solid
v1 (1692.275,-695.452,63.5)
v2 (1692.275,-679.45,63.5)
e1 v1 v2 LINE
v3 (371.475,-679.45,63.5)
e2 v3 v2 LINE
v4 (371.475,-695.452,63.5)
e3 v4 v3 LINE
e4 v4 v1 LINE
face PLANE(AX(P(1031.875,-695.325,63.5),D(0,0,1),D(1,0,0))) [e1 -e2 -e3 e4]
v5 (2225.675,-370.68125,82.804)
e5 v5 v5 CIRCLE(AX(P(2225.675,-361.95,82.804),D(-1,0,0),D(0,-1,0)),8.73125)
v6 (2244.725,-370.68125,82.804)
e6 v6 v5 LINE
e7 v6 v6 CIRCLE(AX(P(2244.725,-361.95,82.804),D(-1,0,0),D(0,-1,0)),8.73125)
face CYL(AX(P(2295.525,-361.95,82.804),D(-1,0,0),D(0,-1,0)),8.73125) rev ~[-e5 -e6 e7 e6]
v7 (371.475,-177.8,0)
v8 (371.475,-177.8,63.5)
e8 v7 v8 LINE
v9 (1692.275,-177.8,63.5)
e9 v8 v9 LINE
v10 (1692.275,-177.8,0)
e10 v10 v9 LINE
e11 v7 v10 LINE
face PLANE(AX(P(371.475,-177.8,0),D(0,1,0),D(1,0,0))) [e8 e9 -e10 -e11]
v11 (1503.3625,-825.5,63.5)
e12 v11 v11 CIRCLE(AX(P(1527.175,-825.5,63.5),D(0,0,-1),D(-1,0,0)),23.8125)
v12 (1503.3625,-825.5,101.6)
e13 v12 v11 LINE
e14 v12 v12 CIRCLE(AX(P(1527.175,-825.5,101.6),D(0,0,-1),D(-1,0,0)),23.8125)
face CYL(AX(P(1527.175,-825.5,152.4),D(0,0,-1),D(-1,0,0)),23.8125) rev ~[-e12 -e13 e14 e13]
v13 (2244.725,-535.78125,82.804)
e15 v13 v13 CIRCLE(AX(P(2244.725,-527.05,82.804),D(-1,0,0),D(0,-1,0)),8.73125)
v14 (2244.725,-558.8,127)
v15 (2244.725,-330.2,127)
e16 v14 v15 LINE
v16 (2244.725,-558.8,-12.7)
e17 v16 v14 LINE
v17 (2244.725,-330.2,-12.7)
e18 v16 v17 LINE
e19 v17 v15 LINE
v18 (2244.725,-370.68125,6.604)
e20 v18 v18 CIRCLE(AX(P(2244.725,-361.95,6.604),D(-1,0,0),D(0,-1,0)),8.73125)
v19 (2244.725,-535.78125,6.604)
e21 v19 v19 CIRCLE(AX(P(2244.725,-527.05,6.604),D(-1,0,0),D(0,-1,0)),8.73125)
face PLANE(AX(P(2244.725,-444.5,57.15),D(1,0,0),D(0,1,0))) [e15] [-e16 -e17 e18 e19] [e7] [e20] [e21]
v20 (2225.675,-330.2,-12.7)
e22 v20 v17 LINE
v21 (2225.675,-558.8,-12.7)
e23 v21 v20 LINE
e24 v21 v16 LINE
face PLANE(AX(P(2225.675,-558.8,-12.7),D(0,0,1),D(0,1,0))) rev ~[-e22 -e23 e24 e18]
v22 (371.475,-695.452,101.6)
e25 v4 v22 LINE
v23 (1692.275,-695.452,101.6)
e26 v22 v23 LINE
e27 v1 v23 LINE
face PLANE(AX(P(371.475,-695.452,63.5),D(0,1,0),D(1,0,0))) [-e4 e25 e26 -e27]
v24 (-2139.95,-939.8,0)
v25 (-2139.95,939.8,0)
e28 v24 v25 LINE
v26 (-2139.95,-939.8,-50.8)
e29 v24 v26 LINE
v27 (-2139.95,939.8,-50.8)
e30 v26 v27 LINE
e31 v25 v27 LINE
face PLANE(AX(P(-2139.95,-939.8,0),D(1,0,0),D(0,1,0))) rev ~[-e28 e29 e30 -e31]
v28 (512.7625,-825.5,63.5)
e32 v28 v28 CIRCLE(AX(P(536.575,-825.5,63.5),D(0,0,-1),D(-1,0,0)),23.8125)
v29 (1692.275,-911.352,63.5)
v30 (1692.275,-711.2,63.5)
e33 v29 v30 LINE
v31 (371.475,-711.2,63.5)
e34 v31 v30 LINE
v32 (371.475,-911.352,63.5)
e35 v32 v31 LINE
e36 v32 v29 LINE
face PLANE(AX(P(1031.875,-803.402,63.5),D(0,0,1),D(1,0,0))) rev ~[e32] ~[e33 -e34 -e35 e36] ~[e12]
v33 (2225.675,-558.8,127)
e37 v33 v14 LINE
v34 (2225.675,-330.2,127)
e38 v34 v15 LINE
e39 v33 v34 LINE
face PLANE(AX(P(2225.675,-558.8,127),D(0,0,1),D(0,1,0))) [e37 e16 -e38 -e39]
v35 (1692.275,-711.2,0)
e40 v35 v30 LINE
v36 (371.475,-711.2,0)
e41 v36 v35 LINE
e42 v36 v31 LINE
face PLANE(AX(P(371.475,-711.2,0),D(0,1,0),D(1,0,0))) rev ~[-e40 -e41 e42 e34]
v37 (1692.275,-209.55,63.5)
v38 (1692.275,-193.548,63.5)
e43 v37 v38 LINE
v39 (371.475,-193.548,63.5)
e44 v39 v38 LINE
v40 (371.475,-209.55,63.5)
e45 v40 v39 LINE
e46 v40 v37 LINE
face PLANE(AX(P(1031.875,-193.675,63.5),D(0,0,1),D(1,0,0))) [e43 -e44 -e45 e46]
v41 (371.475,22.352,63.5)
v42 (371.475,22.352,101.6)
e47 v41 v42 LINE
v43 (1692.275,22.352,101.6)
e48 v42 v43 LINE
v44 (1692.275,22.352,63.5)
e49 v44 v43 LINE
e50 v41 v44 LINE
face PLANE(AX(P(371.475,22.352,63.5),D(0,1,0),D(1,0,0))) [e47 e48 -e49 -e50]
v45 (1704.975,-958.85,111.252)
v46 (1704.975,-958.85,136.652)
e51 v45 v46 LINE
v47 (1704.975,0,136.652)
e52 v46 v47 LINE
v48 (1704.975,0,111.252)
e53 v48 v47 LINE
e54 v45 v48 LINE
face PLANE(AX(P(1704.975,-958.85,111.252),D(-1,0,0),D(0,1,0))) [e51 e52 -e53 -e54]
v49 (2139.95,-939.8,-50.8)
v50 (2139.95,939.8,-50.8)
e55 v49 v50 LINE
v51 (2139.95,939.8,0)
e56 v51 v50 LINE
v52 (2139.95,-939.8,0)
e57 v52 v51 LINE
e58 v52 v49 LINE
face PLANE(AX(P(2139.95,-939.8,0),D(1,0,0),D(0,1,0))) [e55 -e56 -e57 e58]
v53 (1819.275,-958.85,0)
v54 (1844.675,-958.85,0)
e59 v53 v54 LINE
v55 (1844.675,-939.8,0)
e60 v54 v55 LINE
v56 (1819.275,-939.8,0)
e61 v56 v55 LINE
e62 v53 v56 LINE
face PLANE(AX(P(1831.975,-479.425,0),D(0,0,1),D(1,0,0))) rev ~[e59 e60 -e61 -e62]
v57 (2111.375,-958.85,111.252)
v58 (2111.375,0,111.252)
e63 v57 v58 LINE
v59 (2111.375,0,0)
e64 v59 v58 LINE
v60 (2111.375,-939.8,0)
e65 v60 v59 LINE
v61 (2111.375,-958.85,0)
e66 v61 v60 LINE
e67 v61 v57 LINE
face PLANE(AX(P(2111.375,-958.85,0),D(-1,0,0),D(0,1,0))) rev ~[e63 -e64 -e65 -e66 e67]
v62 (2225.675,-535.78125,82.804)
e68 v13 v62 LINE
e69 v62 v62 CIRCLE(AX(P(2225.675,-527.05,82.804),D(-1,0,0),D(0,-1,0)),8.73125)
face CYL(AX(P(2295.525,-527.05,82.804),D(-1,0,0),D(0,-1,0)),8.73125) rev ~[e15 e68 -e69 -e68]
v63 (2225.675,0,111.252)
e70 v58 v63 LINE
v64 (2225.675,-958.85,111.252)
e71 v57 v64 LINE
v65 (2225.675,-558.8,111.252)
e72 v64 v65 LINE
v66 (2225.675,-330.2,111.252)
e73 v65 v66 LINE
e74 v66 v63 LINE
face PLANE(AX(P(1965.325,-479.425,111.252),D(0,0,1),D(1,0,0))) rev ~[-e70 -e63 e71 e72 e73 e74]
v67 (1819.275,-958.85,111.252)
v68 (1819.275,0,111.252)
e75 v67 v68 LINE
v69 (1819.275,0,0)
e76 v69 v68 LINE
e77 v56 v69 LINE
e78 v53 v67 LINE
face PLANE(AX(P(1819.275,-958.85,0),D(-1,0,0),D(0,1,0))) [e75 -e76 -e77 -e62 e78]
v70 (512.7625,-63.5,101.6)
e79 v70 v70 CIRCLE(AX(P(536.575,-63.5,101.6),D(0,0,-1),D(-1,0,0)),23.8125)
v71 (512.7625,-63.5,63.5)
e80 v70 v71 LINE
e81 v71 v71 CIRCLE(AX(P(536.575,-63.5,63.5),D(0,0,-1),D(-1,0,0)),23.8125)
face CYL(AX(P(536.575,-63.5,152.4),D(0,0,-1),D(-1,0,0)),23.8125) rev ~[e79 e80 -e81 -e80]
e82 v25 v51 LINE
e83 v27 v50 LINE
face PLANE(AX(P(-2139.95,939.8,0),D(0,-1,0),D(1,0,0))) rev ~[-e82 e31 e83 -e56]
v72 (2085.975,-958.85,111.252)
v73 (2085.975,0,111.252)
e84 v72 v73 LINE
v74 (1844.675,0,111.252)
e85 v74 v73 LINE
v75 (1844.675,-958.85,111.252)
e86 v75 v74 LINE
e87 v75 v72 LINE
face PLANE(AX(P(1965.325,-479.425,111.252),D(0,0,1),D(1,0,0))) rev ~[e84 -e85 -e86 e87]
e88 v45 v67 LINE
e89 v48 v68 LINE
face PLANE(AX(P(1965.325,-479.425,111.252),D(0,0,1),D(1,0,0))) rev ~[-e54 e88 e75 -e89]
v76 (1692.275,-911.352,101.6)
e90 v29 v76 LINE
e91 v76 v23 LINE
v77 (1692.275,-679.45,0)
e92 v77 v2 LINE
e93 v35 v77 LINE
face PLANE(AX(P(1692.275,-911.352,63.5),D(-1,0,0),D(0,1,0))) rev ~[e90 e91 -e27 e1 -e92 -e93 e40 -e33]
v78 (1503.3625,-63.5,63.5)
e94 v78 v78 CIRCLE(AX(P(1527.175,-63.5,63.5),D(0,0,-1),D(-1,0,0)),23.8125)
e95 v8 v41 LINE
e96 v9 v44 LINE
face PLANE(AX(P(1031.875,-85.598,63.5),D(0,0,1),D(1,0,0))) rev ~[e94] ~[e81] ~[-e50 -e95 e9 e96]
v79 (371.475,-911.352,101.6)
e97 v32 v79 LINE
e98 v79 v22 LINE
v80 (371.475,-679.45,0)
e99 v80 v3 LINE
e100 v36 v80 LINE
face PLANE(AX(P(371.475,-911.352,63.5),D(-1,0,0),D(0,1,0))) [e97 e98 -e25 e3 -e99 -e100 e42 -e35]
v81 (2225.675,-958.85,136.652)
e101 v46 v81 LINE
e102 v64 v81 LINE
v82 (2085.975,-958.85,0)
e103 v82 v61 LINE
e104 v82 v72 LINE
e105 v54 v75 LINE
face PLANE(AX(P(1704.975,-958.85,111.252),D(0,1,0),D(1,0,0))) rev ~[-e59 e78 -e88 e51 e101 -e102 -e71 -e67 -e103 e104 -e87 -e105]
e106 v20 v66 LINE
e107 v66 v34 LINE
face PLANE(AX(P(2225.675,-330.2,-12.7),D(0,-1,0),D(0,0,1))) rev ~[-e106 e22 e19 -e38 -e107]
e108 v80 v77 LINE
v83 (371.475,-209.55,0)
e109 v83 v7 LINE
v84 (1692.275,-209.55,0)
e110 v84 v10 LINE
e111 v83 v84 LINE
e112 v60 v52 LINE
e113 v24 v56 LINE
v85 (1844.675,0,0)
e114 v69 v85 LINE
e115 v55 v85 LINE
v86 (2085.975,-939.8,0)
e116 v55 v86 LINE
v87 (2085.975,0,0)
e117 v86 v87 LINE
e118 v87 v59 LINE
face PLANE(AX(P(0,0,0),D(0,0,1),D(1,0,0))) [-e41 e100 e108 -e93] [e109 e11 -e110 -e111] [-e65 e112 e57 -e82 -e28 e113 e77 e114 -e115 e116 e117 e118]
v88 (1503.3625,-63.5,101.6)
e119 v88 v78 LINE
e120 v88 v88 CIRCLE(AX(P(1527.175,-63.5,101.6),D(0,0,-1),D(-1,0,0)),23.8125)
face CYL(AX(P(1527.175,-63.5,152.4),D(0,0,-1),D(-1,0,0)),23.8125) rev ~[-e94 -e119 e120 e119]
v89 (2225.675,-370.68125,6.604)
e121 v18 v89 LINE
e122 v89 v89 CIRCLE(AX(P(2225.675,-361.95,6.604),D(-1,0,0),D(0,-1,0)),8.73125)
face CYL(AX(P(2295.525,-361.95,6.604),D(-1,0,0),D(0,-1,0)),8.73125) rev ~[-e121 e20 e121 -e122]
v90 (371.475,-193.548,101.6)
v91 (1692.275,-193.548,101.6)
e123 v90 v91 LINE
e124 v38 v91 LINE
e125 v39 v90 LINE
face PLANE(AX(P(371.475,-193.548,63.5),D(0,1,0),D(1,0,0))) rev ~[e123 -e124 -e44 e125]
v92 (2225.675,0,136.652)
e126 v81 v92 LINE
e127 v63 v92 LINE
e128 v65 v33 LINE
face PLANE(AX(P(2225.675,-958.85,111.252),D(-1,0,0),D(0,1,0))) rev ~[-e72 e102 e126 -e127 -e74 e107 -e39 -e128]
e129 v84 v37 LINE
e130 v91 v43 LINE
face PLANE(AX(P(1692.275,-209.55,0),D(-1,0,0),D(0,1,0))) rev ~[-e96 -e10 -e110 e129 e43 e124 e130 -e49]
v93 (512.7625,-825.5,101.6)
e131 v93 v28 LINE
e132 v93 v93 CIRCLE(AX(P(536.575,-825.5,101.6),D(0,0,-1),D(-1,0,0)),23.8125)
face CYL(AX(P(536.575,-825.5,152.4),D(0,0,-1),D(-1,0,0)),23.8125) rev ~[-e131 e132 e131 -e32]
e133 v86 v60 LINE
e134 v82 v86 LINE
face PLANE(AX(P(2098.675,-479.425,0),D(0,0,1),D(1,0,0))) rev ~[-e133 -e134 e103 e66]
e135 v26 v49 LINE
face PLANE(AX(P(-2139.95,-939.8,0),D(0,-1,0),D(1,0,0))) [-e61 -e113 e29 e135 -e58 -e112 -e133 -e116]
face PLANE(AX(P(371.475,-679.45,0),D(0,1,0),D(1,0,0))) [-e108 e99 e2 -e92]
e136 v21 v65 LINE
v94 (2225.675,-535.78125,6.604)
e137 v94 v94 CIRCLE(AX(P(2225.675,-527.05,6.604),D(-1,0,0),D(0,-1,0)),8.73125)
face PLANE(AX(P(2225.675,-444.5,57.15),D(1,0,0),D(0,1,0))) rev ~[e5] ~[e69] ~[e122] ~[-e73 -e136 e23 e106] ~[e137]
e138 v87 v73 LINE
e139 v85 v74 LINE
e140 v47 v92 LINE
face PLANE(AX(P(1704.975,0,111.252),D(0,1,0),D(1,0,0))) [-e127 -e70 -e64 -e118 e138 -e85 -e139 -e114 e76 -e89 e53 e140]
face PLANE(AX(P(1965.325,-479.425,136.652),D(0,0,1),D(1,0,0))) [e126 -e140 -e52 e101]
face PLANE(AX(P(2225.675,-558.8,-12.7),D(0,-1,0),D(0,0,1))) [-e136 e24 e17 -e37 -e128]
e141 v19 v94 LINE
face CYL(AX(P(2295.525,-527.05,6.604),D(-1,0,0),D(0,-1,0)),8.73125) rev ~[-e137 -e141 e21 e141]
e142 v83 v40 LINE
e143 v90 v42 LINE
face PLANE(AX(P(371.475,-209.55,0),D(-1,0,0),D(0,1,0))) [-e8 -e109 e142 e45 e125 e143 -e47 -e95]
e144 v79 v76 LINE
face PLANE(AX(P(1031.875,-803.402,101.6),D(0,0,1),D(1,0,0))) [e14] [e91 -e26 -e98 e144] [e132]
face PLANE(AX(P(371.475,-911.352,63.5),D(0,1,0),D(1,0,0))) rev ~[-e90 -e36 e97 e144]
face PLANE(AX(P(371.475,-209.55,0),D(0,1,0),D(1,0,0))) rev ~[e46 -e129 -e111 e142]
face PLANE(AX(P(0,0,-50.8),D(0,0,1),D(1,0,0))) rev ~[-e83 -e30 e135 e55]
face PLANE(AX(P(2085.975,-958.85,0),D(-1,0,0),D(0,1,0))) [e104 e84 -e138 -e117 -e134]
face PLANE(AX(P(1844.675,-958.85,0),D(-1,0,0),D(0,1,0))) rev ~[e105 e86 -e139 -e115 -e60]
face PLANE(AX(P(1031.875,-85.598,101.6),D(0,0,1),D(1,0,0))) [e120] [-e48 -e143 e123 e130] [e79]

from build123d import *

# Parameters (mm, degrees)
F0_W      = 4279.9
F0_H      = 1879.6
F1_DEPTH  = 50.8
F2_W      = 1320.8
F2_H      = 31.75
F3_DEPTH  = 63.5
F4_W      = 1320.8
F4_H      = 215.9
F5_DEPTH  = 38.1
F7_D      = 47.625
F7_DEPTH  = 50.8
F7_TIP    = 14.3079934906
F8_W      = 25.4
F8_H      = 958.85
F9_DEPTH  = 111.252
F10_W     = 520.7
F10_H     = 958.85
F11_DEPTH = 25.4
F12_W     = 228.6
F12_H     = 139.7
F13_DEPTH = 19.05
F15_D     = 17.4625
F15_DEPTH = 50.8
F15_TIP   = 5.2462642799


# Not quite as in the source:
# - a length typed as a fraction of an inch, garbled in the dataset ("3 / 203.2 mm" for 3/8 in), is restored


with BuildPart() as f1:
    # F0 (on Top) → F1 (new body)
    with BuildSketch(Plane.XY):
        Rectangle(F0_W, F0_H)
    extrude(amount=-F1_DEPTH)

    # F2 (on face) → F3 (join)
    with BuildSketch(Plane.XY):
        with Locations((1031.875, -695.325)):
            Rectangle(F2_W, F2_H)
        with Locations((1031.875, -193.675)):
            Rectangle(F2_W, F2_H)
    extrude(amount=F3_DEPTH)

    # F4 (on face) → F5 (join)
    with BuildSketch(Plane.XY.offset(63.5)):
        with Locations((1031.875, -803.402)):
            Rectangle(F4_W, F4_H)
        with Locations((1031.875, -85.598)):
            Rectangle(F4_W, F4_H)
    extrude(amount=F5_DEPTH)

    # F7
    with Locations(Plane.XY.offset(101.6)):
        with Locations((536.575, -63.5), (1527.175, -63.5), (536.575, -825.5), (1527.175, -825.5)):
            Hole(F7_D / 2, depth=F7_DEPTH)
            with Locations((0, 0, -(F7_DEPTH + F7_TIP / 2))):  # 118° drill point
                Cone(0, F7_D / 2, F7_TIP, mode=Mode.SUBTRACT)

    # F8 (on face) → F9 (join)
    with BuildSketch(Plane.XY):
        with Locations((1831.975, -479.425)):
            Rectangle(F8_W, F8_H)
        with Locations((2098.675, -479.425)):
            Rectangle(F8_W, F8_H)
    extrude(amount=F9_DEPTH)

    # F10 (on face) → F11 (join)
    with BuildSketch(Plane.XY.offset(111.252)):
        with Locations((1965.325, -479.425)):
            Rectangle(F10_W, F10_H)
    extrude(amount=F11_DEPTH)

    # F12 (on face) → F13 (join)
    with BuildSketch(Plane.YZ.offset(2225.675)):
        with Locations((-444.5, 57.15)):
            Rectangle(F12_W, F12_H)
    extrude(amount=F13_DEPTH)

    # F15
    with Locations(Plane.YZ.offset(2244.725)):
        with Locations((-527.05, 82.804), (-527.05, 6.604), (-361.95, 6.604), (-361.95, 82.804)):
            Hole(F15_D / 2, depth=F15_DEPTH)
            with Locations((0, 0, -(F15_DEPTH + F15_TIP / 2))):  # 118° drill point
                Cone(0, F15_D / 2, F15_TIP, mode=Mode.SUBTRACT)


solid = f1.part
